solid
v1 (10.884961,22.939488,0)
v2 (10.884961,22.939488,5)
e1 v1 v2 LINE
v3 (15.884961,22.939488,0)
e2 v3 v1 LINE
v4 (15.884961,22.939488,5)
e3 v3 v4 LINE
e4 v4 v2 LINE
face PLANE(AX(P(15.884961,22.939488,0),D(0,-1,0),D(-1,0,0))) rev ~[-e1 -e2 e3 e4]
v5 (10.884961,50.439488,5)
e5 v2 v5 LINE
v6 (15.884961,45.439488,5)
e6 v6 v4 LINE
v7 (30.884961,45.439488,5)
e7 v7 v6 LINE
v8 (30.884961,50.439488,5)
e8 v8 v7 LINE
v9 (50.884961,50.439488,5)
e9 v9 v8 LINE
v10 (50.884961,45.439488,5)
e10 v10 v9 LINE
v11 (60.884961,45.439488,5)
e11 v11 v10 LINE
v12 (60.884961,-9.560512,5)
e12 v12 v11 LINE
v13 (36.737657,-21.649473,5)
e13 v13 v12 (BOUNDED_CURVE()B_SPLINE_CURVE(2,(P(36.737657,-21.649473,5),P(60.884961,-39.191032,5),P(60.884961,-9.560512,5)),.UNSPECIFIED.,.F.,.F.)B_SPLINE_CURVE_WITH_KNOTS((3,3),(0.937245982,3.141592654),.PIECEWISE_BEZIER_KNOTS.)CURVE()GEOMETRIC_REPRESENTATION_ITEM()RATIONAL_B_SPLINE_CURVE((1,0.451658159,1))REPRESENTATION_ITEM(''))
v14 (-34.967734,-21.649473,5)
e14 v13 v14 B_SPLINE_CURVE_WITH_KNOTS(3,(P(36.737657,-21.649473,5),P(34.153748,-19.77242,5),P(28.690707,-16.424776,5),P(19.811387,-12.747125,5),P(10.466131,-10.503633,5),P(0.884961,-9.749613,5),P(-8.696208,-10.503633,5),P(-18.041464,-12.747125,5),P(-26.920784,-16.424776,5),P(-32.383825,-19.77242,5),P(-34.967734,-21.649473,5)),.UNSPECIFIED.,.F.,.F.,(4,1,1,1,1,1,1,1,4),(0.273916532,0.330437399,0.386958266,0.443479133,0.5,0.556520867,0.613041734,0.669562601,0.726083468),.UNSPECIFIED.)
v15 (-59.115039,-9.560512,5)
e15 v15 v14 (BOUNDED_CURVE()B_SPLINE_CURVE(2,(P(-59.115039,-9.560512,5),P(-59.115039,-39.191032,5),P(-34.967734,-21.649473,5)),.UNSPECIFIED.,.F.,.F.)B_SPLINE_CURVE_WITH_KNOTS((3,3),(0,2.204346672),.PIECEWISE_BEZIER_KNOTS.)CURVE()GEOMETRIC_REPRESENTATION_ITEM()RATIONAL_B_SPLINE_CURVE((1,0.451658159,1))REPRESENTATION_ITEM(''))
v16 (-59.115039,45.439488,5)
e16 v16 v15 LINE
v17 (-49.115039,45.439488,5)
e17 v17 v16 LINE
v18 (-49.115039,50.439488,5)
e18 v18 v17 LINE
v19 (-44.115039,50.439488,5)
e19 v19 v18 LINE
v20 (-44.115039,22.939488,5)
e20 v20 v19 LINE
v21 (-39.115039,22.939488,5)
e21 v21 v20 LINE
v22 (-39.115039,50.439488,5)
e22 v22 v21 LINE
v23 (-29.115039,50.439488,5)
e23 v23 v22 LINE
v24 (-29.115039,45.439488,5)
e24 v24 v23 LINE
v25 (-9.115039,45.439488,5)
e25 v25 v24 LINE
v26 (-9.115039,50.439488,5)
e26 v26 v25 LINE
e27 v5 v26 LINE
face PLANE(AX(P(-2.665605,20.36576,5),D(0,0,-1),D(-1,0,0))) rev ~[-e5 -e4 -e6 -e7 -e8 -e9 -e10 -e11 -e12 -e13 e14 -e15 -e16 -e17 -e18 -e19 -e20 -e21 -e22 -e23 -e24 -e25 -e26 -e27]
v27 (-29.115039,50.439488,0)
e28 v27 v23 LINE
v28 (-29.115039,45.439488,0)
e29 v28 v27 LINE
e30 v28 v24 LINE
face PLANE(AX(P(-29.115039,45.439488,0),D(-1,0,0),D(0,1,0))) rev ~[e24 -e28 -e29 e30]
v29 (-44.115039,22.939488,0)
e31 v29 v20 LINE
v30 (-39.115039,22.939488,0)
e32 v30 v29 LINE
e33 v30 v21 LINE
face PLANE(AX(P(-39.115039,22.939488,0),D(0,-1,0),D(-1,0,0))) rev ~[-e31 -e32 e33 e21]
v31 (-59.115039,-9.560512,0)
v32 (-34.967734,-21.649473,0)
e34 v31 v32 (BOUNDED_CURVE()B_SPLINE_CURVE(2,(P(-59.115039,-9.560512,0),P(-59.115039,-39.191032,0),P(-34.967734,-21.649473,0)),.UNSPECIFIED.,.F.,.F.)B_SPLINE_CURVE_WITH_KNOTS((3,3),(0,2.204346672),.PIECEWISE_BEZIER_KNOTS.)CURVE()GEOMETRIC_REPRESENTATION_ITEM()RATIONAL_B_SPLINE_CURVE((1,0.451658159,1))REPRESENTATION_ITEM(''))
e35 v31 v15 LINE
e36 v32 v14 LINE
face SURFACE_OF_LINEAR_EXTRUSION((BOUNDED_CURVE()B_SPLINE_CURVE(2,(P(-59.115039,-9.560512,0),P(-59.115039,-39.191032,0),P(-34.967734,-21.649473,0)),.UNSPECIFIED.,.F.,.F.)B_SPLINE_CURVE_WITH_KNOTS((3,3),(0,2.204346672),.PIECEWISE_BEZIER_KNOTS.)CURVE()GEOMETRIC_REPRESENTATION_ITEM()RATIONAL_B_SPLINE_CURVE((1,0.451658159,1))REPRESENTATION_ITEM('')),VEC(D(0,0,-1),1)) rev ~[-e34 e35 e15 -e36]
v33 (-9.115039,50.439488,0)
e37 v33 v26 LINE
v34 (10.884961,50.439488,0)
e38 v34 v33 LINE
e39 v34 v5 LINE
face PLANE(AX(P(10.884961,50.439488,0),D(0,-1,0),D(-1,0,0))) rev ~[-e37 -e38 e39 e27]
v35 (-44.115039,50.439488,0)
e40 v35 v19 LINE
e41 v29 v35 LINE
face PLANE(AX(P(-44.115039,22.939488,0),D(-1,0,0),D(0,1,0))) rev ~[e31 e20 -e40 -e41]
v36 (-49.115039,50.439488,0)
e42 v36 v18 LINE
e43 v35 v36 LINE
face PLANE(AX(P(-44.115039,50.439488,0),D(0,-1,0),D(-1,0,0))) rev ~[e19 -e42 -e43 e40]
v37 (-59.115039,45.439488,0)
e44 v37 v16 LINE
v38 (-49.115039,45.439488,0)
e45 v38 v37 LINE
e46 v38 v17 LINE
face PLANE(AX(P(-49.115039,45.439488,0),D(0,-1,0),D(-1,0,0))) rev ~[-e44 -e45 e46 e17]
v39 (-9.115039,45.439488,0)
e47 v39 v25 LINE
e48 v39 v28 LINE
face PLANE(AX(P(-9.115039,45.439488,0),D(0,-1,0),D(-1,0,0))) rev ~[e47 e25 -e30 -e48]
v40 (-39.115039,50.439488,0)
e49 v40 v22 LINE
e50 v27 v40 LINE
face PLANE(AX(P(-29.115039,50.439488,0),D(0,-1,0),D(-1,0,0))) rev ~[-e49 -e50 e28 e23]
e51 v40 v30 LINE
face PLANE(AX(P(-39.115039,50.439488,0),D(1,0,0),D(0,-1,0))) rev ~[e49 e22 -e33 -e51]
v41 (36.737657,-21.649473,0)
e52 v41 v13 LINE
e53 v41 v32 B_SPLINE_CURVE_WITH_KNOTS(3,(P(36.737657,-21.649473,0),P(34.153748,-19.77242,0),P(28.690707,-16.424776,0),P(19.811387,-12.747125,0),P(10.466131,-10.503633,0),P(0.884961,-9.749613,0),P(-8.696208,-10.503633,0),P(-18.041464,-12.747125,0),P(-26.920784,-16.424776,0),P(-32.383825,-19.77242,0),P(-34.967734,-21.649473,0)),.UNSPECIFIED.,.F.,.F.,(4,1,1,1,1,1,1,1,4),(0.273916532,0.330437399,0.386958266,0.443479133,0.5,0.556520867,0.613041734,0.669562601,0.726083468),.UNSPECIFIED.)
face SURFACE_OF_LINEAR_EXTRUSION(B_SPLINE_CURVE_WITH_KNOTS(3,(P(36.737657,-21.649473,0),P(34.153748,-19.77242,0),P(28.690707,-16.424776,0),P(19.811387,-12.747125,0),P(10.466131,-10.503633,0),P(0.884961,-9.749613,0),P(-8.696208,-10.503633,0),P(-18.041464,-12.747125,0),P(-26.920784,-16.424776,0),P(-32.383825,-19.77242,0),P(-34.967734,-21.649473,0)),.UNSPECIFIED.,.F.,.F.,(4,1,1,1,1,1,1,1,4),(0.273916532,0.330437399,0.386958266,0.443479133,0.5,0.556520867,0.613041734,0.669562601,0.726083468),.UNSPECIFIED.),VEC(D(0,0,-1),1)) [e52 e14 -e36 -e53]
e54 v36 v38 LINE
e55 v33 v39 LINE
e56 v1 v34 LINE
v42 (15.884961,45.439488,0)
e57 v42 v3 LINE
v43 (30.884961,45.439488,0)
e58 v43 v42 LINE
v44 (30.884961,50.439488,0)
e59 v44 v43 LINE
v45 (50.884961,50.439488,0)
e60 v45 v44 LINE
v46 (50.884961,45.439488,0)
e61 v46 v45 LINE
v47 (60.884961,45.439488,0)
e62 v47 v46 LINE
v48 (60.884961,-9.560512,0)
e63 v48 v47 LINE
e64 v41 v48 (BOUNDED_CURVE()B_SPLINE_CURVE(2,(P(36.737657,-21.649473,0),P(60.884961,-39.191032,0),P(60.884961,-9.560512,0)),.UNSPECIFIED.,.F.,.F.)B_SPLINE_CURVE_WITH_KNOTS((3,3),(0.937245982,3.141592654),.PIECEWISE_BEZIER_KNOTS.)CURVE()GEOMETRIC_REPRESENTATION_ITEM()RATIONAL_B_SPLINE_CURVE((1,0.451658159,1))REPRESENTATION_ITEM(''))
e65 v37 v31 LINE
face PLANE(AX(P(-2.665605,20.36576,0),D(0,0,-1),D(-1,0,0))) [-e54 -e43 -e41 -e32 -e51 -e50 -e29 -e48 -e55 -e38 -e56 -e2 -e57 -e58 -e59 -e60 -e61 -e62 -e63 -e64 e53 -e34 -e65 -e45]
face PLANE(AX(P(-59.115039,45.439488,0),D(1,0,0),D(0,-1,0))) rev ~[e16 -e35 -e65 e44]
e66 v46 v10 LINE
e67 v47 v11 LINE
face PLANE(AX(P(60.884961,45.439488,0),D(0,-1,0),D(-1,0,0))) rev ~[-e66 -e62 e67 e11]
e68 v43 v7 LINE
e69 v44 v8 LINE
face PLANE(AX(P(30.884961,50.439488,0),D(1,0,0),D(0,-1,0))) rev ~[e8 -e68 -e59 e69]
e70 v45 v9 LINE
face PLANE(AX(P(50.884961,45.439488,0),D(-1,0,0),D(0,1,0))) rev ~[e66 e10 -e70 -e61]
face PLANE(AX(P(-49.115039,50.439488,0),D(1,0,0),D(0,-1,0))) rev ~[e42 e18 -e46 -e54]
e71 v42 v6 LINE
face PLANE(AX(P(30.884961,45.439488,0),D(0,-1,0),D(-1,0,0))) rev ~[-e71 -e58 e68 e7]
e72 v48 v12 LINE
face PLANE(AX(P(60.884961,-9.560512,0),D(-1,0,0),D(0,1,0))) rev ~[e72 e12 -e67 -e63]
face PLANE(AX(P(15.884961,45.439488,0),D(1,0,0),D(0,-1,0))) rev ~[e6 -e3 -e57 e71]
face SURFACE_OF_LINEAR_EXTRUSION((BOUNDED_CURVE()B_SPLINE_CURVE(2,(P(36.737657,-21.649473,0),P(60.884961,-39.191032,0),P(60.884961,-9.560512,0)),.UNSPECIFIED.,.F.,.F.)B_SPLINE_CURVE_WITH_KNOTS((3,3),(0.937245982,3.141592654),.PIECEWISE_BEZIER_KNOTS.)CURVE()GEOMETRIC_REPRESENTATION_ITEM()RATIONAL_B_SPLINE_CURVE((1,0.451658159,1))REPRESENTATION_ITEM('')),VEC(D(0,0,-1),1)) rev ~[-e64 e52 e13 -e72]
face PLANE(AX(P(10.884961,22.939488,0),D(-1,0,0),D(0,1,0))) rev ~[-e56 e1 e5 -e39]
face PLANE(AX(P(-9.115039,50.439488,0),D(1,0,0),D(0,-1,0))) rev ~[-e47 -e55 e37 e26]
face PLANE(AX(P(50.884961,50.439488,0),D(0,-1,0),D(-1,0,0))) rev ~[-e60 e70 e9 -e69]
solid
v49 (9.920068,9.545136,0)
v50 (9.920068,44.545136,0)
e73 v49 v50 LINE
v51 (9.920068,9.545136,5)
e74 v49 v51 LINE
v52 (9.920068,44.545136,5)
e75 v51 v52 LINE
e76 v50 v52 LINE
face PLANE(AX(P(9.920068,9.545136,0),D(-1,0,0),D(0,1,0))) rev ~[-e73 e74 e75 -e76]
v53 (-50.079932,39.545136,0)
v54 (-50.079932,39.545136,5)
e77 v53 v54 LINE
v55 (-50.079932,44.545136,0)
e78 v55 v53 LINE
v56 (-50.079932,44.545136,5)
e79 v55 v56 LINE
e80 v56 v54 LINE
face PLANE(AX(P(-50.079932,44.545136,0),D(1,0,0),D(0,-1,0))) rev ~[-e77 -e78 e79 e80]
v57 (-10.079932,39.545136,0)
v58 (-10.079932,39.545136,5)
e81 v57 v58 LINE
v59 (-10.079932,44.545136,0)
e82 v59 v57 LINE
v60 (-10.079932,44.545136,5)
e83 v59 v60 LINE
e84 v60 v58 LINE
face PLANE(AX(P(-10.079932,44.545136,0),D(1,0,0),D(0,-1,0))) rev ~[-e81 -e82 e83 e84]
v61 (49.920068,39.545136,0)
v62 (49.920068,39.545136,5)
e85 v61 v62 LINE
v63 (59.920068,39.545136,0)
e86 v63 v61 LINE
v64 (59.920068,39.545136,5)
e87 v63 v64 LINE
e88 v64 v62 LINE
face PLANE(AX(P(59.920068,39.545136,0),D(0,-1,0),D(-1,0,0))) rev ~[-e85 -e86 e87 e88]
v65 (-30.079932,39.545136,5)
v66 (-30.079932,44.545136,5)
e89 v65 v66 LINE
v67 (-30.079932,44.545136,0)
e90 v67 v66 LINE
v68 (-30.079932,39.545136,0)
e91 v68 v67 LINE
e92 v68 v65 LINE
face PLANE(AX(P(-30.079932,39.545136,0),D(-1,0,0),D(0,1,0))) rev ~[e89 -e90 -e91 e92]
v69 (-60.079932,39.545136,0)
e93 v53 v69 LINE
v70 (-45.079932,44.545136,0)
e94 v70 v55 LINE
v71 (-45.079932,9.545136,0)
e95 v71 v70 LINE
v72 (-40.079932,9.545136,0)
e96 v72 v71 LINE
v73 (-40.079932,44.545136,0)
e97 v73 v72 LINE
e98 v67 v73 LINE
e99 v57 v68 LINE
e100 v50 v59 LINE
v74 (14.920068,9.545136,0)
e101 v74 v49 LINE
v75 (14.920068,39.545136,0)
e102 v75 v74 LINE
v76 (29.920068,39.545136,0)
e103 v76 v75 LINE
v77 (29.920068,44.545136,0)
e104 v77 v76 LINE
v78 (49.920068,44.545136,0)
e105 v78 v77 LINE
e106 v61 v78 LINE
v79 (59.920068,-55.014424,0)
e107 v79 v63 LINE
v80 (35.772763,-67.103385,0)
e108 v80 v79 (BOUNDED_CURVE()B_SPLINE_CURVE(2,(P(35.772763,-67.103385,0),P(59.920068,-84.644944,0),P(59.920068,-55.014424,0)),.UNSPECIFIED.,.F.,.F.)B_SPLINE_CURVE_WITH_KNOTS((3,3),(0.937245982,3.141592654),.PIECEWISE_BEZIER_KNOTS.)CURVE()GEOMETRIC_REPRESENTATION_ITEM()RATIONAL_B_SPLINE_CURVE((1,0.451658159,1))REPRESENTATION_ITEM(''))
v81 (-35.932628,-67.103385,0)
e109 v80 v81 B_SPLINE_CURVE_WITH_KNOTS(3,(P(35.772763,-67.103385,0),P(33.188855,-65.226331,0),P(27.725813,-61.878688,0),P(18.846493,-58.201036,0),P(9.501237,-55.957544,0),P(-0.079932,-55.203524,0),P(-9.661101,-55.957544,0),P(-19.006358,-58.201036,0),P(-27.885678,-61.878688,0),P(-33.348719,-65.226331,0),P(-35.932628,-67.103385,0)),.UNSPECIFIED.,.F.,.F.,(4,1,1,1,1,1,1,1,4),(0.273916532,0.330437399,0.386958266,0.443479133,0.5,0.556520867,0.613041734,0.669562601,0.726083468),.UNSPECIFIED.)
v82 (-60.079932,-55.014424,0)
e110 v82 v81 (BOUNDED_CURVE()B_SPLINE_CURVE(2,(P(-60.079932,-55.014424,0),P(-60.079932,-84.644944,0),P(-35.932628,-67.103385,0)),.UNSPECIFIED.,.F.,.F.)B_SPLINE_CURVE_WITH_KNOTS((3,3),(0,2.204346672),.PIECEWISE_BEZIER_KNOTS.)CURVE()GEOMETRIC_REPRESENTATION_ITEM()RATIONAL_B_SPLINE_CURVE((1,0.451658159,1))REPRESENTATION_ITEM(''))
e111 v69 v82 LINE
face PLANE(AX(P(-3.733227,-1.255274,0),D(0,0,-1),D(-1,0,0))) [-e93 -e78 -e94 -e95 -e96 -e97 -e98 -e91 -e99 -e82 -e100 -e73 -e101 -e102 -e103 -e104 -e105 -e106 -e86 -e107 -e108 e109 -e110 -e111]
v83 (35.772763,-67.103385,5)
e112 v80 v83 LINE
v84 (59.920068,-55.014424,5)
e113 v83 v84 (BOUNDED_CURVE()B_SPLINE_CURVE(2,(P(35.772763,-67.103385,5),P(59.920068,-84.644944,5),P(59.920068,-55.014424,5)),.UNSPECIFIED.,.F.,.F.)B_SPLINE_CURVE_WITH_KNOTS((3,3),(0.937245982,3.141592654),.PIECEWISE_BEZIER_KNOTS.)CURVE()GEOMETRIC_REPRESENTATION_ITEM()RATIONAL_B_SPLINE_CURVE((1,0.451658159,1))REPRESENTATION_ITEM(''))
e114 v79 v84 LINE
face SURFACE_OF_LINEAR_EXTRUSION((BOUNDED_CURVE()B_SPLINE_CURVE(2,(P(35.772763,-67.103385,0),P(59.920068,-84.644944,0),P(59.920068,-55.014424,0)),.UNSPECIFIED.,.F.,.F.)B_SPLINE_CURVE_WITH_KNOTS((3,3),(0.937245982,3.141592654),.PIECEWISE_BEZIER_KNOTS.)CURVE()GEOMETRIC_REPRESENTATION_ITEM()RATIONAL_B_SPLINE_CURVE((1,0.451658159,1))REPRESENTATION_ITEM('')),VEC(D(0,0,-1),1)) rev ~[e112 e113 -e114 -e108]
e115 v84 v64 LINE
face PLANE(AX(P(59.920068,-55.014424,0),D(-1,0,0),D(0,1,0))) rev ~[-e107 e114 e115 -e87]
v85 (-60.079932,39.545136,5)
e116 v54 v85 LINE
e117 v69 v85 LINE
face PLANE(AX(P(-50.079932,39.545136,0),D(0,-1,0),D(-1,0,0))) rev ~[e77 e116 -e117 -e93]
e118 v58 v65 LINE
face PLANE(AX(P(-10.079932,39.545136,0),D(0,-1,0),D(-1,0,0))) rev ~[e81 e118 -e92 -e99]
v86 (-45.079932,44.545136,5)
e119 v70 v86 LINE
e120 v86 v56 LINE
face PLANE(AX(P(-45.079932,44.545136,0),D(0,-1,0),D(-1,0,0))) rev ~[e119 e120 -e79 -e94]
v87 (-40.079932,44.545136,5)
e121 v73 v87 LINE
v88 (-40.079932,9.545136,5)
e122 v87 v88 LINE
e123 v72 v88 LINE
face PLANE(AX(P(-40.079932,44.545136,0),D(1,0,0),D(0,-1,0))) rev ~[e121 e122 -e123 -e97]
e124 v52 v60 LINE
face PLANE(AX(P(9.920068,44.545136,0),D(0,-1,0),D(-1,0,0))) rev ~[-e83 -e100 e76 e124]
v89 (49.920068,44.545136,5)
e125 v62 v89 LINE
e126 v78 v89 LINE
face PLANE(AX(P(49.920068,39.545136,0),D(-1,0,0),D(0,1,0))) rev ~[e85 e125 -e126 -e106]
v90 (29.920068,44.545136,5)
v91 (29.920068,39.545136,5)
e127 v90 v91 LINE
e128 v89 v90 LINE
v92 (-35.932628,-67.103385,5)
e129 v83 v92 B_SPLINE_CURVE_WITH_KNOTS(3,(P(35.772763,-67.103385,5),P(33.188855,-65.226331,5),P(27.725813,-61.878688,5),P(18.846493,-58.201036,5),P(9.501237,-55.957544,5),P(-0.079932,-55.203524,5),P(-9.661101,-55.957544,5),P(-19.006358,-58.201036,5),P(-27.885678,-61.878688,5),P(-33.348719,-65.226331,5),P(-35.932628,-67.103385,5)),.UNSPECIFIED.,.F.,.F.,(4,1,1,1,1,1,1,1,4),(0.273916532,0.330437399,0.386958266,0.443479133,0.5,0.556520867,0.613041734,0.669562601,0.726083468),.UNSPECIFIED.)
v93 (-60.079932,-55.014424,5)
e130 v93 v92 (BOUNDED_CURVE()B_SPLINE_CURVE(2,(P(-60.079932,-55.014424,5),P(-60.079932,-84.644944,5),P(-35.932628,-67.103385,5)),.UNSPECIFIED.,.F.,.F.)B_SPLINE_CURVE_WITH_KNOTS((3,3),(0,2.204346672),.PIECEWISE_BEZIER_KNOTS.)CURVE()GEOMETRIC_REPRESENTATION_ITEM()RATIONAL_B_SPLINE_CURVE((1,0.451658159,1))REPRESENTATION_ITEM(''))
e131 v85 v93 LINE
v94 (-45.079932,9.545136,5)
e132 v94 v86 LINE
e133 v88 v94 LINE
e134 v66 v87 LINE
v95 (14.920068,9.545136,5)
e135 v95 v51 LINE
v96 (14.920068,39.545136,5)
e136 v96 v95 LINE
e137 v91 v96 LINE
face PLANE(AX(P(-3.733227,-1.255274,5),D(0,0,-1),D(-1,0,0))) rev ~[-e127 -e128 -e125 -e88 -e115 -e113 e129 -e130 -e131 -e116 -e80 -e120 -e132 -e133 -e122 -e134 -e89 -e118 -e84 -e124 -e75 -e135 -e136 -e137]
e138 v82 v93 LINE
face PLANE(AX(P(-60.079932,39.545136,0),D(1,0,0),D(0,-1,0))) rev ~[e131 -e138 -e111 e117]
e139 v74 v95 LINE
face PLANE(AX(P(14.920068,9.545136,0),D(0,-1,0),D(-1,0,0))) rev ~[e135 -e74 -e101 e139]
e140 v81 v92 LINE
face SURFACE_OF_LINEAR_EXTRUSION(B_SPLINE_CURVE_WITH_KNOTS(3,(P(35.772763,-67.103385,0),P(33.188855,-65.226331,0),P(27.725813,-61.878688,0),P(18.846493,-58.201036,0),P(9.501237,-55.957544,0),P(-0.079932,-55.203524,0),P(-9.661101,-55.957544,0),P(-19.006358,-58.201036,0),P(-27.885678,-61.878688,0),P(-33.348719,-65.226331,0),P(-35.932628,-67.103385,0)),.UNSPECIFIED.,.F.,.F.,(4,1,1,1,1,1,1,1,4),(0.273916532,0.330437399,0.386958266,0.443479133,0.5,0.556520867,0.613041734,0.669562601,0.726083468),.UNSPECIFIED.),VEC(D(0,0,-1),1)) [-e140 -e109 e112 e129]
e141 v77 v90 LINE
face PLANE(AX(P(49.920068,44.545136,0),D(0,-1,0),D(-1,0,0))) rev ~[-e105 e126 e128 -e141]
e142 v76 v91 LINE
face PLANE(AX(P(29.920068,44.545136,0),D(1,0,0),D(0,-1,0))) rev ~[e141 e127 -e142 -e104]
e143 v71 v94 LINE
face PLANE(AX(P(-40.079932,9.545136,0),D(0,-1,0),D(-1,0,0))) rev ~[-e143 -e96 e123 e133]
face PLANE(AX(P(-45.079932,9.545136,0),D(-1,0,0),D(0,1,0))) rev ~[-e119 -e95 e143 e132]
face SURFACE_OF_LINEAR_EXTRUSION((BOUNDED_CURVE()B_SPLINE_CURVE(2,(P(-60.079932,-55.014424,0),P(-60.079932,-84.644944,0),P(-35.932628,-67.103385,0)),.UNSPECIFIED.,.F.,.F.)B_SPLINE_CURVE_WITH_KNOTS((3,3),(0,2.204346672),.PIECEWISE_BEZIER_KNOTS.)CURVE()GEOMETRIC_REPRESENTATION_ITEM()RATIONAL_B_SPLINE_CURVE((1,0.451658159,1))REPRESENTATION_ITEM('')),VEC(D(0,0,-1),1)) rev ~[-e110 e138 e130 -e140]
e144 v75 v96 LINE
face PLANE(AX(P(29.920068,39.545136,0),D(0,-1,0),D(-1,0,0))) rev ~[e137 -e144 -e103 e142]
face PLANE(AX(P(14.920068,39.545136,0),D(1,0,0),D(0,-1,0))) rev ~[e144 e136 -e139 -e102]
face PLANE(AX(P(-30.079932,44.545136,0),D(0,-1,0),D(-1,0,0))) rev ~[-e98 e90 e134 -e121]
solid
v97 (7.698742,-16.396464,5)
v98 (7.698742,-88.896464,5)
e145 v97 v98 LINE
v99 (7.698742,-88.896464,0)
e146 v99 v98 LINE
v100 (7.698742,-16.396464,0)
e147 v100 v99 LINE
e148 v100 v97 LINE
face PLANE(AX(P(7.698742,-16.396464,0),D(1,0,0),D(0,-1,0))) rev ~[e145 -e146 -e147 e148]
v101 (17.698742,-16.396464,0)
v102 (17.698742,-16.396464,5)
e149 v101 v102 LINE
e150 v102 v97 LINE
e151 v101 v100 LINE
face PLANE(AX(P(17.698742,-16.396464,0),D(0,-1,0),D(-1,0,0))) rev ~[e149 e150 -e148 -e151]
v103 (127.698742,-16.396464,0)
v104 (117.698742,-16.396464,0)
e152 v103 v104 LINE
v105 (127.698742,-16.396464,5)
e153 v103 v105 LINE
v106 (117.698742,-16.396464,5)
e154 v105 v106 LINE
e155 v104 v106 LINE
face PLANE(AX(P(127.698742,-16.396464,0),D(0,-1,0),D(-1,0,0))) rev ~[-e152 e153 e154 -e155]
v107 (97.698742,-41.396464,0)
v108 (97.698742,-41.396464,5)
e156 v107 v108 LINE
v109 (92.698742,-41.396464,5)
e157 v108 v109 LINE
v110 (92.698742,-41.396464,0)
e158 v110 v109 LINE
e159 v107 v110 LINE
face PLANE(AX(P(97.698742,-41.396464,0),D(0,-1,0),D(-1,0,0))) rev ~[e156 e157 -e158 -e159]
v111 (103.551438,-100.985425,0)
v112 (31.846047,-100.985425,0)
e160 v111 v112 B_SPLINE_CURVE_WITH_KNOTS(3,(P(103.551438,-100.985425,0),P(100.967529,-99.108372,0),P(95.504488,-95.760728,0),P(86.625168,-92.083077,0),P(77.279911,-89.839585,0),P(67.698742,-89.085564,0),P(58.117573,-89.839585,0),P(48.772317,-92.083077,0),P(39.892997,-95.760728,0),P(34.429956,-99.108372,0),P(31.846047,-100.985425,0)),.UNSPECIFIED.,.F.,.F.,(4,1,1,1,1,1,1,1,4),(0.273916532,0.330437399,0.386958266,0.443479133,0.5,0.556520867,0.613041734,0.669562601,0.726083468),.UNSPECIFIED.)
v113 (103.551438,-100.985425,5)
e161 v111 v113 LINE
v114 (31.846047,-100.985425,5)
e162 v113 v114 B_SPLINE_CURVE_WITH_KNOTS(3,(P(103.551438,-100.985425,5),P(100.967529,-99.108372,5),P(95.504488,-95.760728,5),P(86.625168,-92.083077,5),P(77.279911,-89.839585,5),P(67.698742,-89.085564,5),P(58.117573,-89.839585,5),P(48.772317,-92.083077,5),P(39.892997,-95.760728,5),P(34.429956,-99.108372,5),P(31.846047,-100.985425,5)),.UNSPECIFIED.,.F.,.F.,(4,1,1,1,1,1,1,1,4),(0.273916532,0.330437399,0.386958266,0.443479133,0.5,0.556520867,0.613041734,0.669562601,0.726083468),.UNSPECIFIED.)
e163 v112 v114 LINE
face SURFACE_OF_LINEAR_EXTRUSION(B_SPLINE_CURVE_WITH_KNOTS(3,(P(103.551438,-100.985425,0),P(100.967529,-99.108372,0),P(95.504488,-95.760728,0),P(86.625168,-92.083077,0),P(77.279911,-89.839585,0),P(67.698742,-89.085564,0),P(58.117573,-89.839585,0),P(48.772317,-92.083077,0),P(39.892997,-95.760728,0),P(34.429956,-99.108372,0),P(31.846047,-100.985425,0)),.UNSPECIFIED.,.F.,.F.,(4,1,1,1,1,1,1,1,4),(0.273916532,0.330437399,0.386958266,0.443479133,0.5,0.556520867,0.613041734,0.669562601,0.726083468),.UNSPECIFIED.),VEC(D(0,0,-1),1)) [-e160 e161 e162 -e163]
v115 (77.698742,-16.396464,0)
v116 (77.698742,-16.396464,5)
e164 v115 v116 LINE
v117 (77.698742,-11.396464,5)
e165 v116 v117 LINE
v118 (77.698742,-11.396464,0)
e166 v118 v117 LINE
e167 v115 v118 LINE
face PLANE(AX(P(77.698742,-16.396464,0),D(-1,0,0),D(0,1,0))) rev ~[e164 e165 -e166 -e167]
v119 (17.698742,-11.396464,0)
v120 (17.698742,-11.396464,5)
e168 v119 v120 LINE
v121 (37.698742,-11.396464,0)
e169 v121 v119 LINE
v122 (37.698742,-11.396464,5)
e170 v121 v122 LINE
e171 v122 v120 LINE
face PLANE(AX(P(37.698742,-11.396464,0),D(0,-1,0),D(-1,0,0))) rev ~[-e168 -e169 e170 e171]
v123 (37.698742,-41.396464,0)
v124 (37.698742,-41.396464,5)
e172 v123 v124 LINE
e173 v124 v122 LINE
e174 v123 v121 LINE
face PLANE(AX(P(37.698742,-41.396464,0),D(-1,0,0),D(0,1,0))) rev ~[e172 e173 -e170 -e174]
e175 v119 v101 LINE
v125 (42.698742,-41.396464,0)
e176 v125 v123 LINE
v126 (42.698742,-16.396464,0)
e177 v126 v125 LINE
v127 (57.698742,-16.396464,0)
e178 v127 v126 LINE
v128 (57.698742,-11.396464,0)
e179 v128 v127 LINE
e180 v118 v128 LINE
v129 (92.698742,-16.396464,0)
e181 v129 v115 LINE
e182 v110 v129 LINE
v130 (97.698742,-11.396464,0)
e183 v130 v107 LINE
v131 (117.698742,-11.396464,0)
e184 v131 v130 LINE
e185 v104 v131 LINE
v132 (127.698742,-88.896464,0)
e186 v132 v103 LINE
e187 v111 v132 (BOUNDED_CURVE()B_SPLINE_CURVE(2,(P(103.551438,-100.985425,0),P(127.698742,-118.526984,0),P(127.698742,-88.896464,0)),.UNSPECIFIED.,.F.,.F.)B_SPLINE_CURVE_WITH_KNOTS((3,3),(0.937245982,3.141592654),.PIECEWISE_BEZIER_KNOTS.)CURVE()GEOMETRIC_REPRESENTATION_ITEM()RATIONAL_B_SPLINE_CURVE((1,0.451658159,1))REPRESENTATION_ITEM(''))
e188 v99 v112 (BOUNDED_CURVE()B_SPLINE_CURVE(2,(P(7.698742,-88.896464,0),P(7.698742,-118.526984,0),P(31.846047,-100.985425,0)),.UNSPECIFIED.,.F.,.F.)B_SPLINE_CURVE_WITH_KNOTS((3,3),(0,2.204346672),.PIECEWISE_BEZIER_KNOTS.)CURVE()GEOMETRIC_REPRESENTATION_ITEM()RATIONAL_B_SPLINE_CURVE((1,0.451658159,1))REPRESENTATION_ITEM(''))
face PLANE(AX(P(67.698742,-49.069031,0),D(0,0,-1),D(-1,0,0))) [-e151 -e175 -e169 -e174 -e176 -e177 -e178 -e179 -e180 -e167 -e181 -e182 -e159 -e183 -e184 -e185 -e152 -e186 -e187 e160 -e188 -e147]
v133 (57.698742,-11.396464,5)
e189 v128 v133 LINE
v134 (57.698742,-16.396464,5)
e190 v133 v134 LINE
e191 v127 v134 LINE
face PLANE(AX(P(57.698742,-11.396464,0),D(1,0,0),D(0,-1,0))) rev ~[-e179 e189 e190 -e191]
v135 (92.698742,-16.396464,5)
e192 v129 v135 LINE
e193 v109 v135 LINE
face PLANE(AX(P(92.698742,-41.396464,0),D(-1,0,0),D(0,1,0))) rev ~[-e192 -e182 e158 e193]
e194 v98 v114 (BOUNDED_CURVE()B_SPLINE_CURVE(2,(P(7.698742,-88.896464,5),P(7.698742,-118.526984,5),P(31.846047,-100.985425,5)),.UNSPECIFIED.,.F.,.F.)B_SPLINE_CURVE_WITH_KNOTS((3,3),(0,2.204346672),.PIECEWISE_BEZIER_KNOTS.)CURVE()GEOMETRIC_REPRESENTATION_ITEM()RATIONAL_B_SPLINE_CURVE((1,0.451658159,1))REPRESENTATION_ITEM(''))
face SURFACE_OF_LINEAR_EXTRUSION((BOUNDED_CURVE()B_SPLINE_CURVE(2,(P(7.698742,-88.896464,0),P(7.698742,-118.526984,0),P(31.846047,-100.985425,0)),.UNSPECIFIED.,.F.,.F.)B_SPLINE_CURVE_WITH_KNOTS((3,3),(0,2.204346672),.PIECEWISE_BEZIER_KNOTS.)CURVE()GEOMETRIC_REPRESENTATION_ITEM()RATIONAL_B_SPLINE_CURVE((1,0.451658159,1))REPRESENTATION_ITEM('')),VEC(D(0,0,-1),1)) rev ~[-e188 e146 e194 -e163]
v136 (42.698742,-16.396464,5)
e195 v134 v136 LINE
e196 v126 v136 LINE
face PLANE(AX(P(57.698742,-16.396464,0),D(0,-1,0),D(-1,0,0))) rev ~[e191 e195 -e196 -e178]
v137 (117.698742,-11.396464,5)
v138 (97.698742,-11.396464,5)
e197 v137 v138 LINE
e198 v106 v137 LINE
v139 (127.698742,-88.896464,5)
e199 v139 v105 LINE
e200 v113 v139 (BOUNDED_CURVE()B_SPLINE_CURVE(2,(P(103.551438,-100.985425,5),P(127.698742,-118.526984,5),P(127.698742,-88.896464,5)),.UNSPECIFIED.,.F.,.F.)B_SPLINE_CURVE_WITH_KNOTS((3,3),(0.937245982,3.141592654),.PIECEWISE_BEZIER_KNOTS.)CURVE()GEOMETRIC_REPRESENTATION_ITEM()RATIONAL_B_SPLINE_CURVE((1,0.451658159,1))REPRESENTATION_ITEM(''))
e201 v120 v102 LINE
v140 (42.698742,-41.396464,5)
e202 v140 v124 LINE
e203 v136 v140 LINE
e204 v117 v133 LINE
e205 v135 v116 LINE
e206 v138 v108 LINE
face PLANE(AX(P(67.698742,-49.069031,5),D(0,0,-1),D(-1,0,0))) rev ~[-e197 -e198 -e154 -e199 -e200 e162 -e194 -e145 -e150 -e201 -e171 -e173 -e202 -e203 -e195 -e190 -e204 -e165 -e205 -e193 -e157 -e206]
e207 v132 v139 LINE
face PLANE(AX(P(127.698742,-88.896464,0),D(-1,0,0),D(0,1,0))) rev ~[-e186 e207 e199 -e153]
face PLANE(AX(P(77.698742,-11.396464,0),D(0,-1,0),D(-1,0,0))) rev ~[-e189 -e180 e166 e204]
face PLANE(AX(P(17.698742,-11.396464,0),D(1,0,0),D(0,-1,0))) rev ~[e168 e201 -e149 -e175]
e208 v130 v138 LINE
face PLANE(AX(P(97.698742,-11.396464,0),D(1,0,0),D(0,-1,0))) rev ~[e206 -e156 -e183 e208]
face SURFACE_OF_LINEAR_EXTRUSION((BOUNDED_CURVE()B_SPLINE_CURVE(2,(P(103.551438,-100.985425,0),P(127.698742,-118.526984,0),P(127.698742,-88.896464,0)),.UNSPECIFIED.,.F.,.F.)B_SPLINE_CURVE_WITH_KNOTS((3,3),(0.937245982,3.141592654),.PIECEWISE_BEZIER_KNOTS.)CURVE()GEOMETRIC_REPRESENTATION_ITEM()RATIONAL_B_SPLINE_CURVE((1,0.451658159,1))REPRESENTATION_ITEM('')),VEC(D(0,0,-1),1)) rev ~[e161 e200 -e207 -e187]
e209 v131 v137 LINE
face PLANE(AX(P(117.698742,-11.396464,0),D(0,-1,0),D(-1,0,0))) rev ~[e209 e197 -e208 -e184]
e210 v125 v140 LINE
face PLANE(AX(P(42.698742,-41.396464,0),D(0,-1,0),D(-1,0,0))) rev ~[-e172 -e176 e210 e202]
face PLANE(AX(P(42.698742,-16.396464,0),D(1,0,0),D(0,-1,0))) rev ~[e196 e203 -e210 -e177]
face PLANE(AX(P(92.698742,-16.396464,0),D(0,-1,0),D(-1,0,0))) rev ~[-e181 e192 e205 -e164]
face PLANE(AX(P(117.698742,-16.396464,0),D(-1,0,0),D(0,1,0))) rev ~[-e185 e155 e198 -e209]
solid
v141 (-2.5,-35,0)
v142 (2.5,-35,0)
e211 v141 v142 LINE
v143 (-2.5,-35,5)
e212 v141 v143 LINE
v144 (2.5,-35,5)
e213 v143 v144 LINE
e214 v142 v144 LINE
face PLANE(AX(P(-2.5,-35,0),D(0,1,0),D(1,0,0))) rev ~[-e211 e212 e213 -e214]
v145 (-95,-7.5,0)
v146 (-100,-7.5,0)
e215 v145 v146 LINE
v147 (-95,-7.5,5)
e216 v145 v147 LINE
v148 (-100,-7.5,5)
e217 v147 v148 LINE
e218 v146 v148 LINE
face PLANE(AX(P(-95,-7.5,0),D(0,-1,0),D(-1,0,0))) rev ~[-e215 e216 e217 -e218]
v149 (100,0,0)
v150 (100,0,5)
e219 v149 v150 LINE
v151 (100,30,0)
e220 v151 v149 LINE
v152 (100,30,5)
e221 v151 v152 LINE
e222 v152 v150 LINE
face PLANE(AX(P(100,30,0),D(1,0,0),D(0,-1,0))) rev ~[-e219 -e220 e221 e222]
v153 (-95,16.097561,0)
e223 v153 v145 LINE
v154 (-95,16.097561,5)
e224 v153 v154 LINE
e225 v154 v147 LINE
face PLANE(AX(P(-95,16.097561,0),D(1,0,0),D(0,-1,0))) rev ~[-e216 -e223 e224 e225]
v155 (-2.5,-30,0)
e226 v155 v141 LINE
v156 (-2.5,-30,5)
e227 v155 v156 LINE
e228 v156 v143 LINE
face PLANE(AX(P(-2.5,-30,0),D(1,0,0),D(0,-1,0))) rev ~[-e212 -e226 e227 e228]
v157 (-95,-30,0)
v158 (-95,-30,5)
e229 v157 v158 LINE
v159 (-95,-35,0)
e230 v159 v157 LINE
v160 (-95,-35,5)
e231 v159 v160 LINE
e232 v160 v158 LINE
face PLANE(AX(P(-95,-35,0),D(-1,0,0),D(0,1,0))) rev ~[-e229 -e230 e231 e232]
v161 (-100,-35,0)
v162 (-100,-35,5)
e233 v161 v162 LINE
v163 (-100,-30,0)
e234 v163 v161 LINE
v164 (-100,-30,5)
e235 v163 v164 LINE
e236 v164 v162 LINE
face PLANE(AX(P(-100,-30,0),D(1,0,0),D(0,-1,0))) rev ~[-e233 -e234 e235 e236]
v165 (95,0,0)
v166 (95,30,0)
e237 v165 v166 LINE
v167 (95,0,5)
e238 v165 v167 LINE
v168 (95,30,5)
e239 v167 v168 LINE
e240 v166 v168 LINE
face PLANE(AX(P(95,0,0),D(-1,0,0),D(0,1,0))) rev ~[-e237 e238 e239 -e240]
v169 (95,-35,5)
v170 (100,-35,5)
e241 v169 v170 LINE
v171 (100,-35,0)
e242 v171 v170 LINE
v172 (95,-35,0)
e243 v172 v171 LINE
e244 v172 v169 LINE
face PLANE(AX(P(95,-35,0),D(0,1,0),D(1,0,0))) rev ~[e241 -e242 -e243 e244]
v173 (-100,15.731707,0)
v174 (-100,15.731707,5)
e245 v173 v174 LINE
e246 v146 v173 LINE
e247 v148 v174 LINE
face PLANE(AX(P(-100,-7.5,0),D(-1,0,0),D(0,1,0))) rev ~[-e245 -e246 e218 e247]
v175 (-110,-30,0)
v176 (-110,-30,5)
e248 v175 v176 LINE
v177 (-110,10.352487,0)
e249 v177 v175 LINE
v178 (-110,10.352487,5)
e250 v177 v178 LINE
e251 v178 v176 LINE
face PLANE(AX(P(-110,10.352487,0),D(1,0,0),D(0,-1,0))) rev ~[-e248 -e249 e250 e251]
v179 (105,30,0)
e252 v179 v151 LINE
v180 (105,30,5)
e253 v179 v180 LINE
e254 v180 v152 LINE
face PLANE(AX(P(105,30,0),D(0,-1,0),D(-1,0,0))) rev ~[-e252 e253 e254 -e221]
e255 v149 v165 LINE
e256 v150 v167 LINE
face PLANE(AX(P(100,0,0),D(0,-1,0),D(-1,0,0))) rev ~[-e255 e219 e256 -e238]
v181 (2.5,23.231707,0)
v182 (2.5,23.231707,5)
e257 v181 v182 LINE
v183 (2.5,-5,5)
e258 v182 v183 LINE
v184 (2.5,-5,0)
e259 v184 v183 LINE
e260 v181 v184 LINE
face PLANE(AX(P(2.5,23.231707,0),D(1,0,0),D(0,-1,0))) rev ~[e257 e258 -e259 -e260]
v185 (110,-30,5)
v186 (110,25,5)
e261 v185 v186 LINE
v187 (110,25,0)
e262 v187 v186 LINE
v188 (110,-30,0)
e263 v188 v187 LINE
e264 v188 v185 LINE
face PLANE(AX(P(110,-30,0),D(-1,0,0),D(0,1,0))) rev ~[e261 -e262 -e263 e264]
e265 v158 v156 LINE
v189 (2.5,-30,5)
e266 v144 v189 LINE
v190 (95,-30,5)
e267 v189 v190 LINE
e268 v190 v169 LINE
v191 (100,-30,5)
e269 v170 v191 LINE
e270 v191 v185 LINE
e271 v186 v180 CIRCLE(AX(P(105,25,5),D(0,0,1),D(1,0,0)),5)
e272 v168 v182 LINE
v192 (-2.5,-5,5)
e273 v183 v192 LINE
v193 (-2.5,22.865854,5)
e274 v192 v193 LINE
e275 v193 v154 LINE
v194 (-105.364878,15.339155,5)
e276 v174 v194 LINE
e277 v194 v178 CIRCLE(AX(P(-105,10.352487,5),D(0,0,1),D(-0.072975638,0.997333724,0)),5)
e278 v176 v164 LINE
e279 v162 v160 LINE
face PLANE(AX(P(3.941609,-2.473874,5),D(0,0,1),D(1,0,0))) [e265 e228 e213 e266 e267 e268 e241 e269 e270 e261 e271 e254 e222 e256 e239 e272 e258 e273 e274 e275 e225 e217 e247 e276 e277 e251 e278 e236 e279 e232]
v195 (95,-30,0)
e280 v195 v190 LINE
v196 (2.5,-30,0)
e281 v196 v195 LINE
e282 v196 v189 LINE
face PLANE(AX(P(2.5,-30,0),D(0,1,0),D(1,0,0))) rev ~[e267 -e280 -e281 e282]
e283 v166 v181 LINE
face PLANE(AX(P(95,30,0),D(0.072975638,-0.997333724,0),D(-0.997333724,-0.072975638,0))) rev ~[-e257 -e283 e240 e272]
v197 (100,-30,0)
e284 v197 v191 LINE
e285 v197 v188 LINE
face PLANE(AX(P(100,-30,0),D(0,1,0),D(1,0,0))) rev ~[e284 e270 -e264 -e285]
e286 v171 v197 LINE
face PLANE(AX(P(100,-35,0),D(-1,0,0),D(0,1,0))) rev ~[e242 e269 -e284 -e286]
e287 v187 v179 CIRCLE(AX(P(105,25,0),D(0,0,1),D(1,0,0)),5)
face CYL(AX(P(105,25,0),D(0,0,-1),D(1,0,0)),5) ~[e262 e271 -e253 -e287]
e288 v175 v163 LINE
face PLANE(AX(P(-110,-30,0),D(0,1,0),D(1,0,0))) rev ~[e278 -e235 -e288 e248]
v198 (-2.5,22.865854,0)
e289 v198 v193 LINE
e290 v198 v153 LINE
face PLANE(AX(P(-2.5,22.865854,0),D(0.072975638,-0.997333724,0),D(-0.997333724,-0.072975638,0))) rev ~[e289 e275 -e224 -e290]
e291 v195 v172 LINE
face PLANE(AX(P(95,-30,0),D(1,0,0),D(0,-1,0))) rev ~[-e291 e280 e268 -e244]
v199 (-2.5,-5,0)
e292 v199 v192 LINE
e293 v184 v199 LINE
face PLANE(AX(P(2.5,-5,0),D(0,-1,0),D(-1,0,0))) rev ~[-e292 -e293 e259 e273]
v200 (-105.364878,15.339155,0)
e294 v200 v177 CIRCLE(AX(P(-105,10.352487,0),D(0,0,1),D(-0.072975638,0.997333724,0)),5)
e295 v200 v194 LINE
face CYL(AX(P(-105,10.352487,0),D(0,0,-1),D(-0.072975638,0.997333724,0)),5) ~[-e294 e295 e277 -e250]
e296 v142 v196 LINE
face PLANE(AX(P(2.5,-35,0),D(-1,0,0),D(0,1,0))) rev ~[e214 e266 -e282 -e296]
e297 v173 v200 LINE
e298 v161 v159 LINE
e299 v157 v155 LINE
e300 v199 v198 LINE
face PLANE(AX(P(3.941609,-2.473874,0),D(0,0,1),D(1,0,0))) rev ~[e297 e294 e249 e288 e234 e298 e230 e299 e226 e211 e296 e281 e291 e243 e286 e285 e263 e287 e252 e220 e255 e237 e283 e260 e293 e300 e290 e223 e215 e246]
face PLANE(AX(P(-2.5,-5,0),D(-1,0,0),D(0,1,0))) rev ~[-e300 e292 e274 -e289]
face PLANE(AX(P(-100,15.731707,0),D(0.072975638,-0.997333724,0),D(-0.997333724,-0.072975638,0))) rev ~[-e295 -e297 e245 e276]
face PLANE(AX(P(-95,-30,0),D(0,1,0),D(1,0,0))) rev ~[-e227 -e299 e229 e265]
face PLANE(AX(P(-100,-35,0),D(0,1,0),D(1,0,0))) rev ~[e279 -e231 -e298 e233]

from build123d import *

# Parameters (mm, degrees)
F5_DEPTH = 5
F6_DEPTH = 5
F7_DEPTH = 5
F8_DEPTH = 5


# Not quite as in the source:
# - the dataset's text gives a spline's control points without its knots; the knots are read off the source's solid


with BuildPart() as f5:
    # F1 (on Top) → F5 (new body)
    with BuildSketch(Plane.XY):
        with BuildLine():
            add(Edge.make_bspline(
                [(35.7727633026, -67.1033849488), (33.1888546546, -65.2263313398), (27.7258131524, -61.8786878763), (18.8464933001, -58.2010364024), (9.5012368587, -55.9575441024), (-0.0799322126, -55.2035239896), (-9.661101284, -55.9575441023), (-19.0063577254, -58.2010364023), (-27.8856775777, -61.8786878761), (-33.3487190799, -65.2263313396), (-35.932627728, -67.1033849485)],
                knots=[0.2739165322, 0.2739165322, 0.2739165322, 0.2739165322, 0.3304373991, 0.3869582661, 0.443479133, 0.5, 0.556520867, 0.6130417339, 0.6695626009, 0.7260834678, 0.7260834678, 0.7260834678, 0.7260834678], degree=3))
            add(Edge.make_bspline(
                [(35.7727633017, -67.1033849481), (59.9200677872, -84.6449435725), (59.9200677872, -55.0144236535)],
                knots=[0.9372459818, 0.9372459818, 0.9372459818, 3.1415926536, 3.1415926536, 3.1415926536], degree=2, weights=[1, 0.4516581587, 1]))
            Line((59.9200677872, -55.0144236535), (59.9200677872, 39.5451359728))
            Line((59.9200677872, 39.5451359728), (49.9200677872, 39.5451359728))
            Line((49.9200677872, 39.5451359728), (49.9200677872, 44.5451359728))
            Line((49.9200677872, 44.5451359728), (29.9200677872, 44.5451359728))
            Line((29.9200677872, 44.5451359728), (29.9200677872, 39.5451359728))
            Line((29.9200677872, 39.5451359728), (14.9200677872, 39.5451359728))
            Line((14.9200677872, 39.5451359728), (14.9200677872, 9.5451359728))
            Line((14.9200677872, 9.5451359728), (9.9200677872, 9.5451359728))
            Line((9.9200677872, 9.5451359728), (9.9200677872, 39.5451359728))
            Line((9.9200677872, 39.5451359728), (9.9200677872, 44.5451359728))
            Line((9.9200677872, 44.5451359728), (-10.0799322128, 44.5451359728))
            Line((-10.0799322128, 44.5451359728), (-10.0799322128, 39.5451359728))
            Line((-10.0799322128, 39.5451359728), (-30.0799322128, 39.5451359728))
            Line((-30.0799322128, 39.5451359728), (-30.0799322128, 44.5451359728))
            Line((-30.0799322128, 44.5451359728), (-40.0799322128, 44.5451359728))
            Line((-40.0799322128, 44.5451359728), (-40.0799322128, 9.5451359728))
            Line((-40.0799322128, 9.5451359728), (-45.0799322128, 9.5451359728))
            Line((-45.0799322128, 9.5451359728), (-45.0799322128, 39.5451359728))
            Line((-45.0799322128, 39.5451359728), (-45.0799322128, 44.5451359728))
            Line((-45.0799322128, 44.5451359728), (-50.0799322128, 44.5451359728))
            Line((-50.0799322128, 44.5451359728), (-50.0799322128, 39.5451359728))
            Line((-50.0799322128, 39.5451359728), (-60.0799322128, 39.5451359728))
            Line((-60.0799322128, 39.5451359728), (-60.0799322128, -55.0144236535))
            add(Edge.make_bspline(
                [(-60.0799322128, -55.0144236535), (-60.0799322128, -84.6449435725), (-35.9326277274, -67.1033849481)],
                knots=[0, 0, 0, 2.2043466718, 2.2043466718, 2.2043466718], degree=2, weights=[1, 0.4516581587, 1]))
        make_face()
    extrude(amount=F5_DEPTH)


with BuildPart() as f6:
    # F2 (on Top) → F6 (new body)
    with BuildSketch(Plane.XY):
        with BuildLine():
            add(Edge.make_bspline(
                [(103.5514379038, -100.9854254094), (100.9675292558, -99.1083718005), (95.5044877536, -95.760728337), (86.6251679013, -92.083076863), (77.2799114599, -89.8395845631), (67.6987423886, -89.0855644503), (58.1175733172, -89.839584563), (48.7723168758, -92.0830768629), (39.8929970235, -95.7607283368), (34.4299555213, -99.1083718002), (31.8460468732, -100.9854254092)],
                knots=[0.2739165322, 0.2739165322, 0.2739165322, 0.2739165322, 0.3304373991, 0.3869582661, 0.443479133, 0.5, 0.556520867, 0.6130417339, 0.6695626009, 0.7260834678, 0.7260834678, 0.7260834678, 0.7260834678], degree=3))
            add(Edge.make_bspline(
                [(103.5514379029, -100.9854254088), (127.6987423883, -118.5269840331), (127.6987423883, -88.8964641141)],
                knots=[0.9372459818, 0.9372459818, 0.9372459818, 3.1415926536, 3.1415926536, 3.1415926536], degree=2, weights=[1, 0.4516581587, 1]))
            Line((127.6987423883, -88.8964641141), (127.6987423883, -16.3964641141))
            Line((127.6987423883, -16.3964641141), (117.6987423883, -16.3964641141))
            Line((117.6987423883, -16.3964641141), (117.6987423883, -11.3964641141))
            Line((117.6987423883, -11.3964641141), (97.6987423883, -11.3964641141))
            Line((97.6987423883, -11.3964641141), (97.6987423883, -41.3964641141))
            Line((97.6987423883, -41.3964641141), (92.6987423883, -41.3964641141))
            Line((92.6987423883, -41.3964641141), (92.6987423883, -16.3964641141))
            Line((92.6987423883, -16.3964641141), (77.6987423883, -16.3964641141))
            Line((77.6987423883, -16.3964641141), (77.6987423883, -11.3964641141))
            Line((77.6987423883, -11.3964641141), (57.6987423883, -11.3964641141))
            Line((57.6987423883, -11.3964641141), (57.6987423883, -16.3964641141))
            Line((57.6987423883, -16.3964641141), (42.6987423883, -16.3964641141))
            Line((42.6987423883, -16.3964641141), (42.6987423883, -41.3964641141))
            Line((42.6987423883, -41.3964641141), (37.6987423883, -41.3964641141))
            Line((37.6987423883, -41.3964641141), (37.6987423883, -11.3964641141))
            Line((37.6987423883, -11.3964641141), (17.6987423883, -11.3964641141))
            Line((17.6987423883, -11.3964641141), (17.6987423883, -16.3964641141))
            Line((17.6987423883, -16.3964641141), (7.6987423883, -16.3964641141))
            Line((7.6987423883, -16.3964641141), (7.6987423883, -88.8964641141))
            add(Edge.make_bspline(
                [(7.6987423883, -88.8964641141), (7.6987423883, -118.5269840331), (31.8460468738, -100.9854254088)],
                knots=[0, 0, 0, 2.2043466718, 2.2043466718, 2.2043466718], degree=2, weights=[1, 0.4516581587, 1]))
        make_face()
    extrude(amount=F6_DEPTH)


with BuildPart() as f7:
    # F4 (on Top) → F7 (new body)
    with BuildSketch(Plane.XY):
        with BuildLine():
            add(Edge.make_bspline(
                [(36.7376570142, -21.649473493), (34.1537483662, -19.772419884), (28.690706864, -16.4247764205), (19.8113870117, -12.7471249466), (10.4661305703, -10.5036326466), (0.884961499, -9.7496125338), (-8.6962075724, -10.5036326465), (-18.0414640138, -12.7471249464), (-26.9207838661, -16.4247764203), (-32.3838253683, -19.7724198838), (-34.9677340164, -21.6494734927)],
                knots=[0.2739165322, 0.2739165322, 0.2739165322, 0.2739165322, 0.3304373991, 0.3869582661, 0.443479133, 0.5, 0.556520867, 0.6130417339, 0.6695626009, 0.7260834678, 0.7260834678, 0.7260834678, 0.7260834678], degree=3))
            add(Edge.make_bspline(
                [(36.7376570133, -21.6494734923), (60.8849614988, -39.1910321167), (60.8849614988, -9.5605121977)],
                knots=[0.9372459818, 0.9372459818, 0.9372459818, 3.1415926536, 3.1415926536, 3.1415926536], degree=2, weights=[1, 0.4516581587, 1]))
            Line((60.8849614988, -9.5605121977), (60.8849614988, 45.4394878023))
            Line((60.8849614988, 45.4394878023), (50.8849614988, 45.4394878023))
            Line((50.8849614988, 45.4394878023), (50.8849614988, 50.4394878023))
            Line((50.8849614988, 50.4394878023), (30.8849614988, 50.4394878023))
            Line((30.8849614988, 50.4394878023), (30.8849614988, 45.4394878023))
            Line((30.8849614988, 45.4394878023), (15.8849614988, 45.4394878023))
            Line((15.8849614988, 45.4394878023), (15.8849614988, 22.9394878023))
            Line((15.8849614988, 22.9394878023), (10.8849614988, 22.9394878023))
            Line((10.8849614988, 22.9394878023), (10.8849614988, 45.4394878023))
            Line((10.8849614988, 45.4394878023), (10.8849614988, 50.4394878023))
            Line((10.8849614988, 50.4394878023), (-9.1150385012, 50.4394878023))
            Line((-9.1150385012, 50.4394878023), (-9.1150385012, 45.4394878023))
            Line((-9.1150385012, 45.4394878023), (-29.1150385012, 45.4394878023))
            Line((-29.1150385012, 45.4394878023), (-29.1150385012, 50.4394878023))
            Line((-29.1150385012, 50.4394878023), (-39.1150385012, 50.4394878023))
            Line((-39.1150385012, 50.4394878023), (-39.1150385012, 22.9394878023))
            Line((-39.1150385012, 22.9394878023), (-44.1150385012, 22.9394878023))
            Line((-44.1150385012, 22.9394878023), (-44.1150385012, 45.4394878023))
            Line((-44.1150385012, 45.4394878023), (-44.1150385012, 50.4394878023))
            Line((-44.1150385012, 50.4394878023), (-49.1150385012, 50.4394878023))
            Line((-49.1150385012, 50.4394878023), (-49.1150385012, 45.4394878023))
            Line((-49.1150385012, 45.4394878023), (-59.1150385012, 45.4394878023))
            Line((-59.1150385012, 45.4394878023), (-59.1150385012, -9.5605121977))
            add(Edge.make_bspline(
                [(-59.1150385012, -9.5605121977), (-59.1150385012, -39.1910321167), (-34.9677340158, -21.6494734923)],
                knots=[0, 0, 0, 2.2043466718, 2.2043466718, 2.2043466718], degree=2, weights=[1, 0.4516581587, 1]))
        make_face()
    extrude(amount=F7_DEPTH)


with BuildPart() as f8:
    # F3 (on Top) → F8 (new body)
    with BuildSketch(Plane.XY):
        with BuildLine():
            Line((100, -30), (110, -30))
            Line((110, -30), (110, 25))
            ThreePointArc((110, 25), (108.5355339059, 28.5355339059), (105, 30))
            Line((105, 30), (100, 30))
            Line((100, 30), (100, 0))
            Line((100, 0), (95, 0))
            Line((95, 0), (95, 30))
            Line((95, 30), (2.5, 23.2317073171))
            Line((2.5, 23.2317073171), (2.5, -5))
            Line((2.5, -5), (-2.5, -5))
            Line((-2.5, -5), (-2.5, 22.8658536585))
            Line((-2.5, 22.8658536585), (-95, 16.0975609756))
            Line((-95, 16.0975609756), (-95, -7.5))
            Line((-95, -7.5), (-100, -7.5))
            Line((-100, -7.5), (-100, 15.7317073171))
            Line((-100, 15.7317073171), (-105.3648781916, 15.3391552543))
            ThreePointArc((-105.3648781916, 15.3391552543), (-108.6622664402, 13.7565730807), (-110, 10.3524866363))
            Line((-110, 10.3524866363), (-110, -30))
            Line((-110, -30), (-100, -30))
            Line((-100, -30), (-100, -35))
            Line((-100, -35), (-95, -35))
            Line((-95, -35), (-95, -30))
            Line((-95, -30), (-2.5, -30))
            Line((-2.5, -30), (-2.5, -35))
            Line((-2.5, -35), (2.5, -35))
            Line((2.5, -35), (2.5, -30))
            Line((2.5, -30), (95, -30))
            Line((95, -30), (95, -35))
            Line((95, -35), (100, -35))
            Line((100, -35), (100, -30))
        make_face()
    extrude(amount=F8_DEPTH)


solid = Compound([f5.part, f6.part, f7.part, f8.part])
